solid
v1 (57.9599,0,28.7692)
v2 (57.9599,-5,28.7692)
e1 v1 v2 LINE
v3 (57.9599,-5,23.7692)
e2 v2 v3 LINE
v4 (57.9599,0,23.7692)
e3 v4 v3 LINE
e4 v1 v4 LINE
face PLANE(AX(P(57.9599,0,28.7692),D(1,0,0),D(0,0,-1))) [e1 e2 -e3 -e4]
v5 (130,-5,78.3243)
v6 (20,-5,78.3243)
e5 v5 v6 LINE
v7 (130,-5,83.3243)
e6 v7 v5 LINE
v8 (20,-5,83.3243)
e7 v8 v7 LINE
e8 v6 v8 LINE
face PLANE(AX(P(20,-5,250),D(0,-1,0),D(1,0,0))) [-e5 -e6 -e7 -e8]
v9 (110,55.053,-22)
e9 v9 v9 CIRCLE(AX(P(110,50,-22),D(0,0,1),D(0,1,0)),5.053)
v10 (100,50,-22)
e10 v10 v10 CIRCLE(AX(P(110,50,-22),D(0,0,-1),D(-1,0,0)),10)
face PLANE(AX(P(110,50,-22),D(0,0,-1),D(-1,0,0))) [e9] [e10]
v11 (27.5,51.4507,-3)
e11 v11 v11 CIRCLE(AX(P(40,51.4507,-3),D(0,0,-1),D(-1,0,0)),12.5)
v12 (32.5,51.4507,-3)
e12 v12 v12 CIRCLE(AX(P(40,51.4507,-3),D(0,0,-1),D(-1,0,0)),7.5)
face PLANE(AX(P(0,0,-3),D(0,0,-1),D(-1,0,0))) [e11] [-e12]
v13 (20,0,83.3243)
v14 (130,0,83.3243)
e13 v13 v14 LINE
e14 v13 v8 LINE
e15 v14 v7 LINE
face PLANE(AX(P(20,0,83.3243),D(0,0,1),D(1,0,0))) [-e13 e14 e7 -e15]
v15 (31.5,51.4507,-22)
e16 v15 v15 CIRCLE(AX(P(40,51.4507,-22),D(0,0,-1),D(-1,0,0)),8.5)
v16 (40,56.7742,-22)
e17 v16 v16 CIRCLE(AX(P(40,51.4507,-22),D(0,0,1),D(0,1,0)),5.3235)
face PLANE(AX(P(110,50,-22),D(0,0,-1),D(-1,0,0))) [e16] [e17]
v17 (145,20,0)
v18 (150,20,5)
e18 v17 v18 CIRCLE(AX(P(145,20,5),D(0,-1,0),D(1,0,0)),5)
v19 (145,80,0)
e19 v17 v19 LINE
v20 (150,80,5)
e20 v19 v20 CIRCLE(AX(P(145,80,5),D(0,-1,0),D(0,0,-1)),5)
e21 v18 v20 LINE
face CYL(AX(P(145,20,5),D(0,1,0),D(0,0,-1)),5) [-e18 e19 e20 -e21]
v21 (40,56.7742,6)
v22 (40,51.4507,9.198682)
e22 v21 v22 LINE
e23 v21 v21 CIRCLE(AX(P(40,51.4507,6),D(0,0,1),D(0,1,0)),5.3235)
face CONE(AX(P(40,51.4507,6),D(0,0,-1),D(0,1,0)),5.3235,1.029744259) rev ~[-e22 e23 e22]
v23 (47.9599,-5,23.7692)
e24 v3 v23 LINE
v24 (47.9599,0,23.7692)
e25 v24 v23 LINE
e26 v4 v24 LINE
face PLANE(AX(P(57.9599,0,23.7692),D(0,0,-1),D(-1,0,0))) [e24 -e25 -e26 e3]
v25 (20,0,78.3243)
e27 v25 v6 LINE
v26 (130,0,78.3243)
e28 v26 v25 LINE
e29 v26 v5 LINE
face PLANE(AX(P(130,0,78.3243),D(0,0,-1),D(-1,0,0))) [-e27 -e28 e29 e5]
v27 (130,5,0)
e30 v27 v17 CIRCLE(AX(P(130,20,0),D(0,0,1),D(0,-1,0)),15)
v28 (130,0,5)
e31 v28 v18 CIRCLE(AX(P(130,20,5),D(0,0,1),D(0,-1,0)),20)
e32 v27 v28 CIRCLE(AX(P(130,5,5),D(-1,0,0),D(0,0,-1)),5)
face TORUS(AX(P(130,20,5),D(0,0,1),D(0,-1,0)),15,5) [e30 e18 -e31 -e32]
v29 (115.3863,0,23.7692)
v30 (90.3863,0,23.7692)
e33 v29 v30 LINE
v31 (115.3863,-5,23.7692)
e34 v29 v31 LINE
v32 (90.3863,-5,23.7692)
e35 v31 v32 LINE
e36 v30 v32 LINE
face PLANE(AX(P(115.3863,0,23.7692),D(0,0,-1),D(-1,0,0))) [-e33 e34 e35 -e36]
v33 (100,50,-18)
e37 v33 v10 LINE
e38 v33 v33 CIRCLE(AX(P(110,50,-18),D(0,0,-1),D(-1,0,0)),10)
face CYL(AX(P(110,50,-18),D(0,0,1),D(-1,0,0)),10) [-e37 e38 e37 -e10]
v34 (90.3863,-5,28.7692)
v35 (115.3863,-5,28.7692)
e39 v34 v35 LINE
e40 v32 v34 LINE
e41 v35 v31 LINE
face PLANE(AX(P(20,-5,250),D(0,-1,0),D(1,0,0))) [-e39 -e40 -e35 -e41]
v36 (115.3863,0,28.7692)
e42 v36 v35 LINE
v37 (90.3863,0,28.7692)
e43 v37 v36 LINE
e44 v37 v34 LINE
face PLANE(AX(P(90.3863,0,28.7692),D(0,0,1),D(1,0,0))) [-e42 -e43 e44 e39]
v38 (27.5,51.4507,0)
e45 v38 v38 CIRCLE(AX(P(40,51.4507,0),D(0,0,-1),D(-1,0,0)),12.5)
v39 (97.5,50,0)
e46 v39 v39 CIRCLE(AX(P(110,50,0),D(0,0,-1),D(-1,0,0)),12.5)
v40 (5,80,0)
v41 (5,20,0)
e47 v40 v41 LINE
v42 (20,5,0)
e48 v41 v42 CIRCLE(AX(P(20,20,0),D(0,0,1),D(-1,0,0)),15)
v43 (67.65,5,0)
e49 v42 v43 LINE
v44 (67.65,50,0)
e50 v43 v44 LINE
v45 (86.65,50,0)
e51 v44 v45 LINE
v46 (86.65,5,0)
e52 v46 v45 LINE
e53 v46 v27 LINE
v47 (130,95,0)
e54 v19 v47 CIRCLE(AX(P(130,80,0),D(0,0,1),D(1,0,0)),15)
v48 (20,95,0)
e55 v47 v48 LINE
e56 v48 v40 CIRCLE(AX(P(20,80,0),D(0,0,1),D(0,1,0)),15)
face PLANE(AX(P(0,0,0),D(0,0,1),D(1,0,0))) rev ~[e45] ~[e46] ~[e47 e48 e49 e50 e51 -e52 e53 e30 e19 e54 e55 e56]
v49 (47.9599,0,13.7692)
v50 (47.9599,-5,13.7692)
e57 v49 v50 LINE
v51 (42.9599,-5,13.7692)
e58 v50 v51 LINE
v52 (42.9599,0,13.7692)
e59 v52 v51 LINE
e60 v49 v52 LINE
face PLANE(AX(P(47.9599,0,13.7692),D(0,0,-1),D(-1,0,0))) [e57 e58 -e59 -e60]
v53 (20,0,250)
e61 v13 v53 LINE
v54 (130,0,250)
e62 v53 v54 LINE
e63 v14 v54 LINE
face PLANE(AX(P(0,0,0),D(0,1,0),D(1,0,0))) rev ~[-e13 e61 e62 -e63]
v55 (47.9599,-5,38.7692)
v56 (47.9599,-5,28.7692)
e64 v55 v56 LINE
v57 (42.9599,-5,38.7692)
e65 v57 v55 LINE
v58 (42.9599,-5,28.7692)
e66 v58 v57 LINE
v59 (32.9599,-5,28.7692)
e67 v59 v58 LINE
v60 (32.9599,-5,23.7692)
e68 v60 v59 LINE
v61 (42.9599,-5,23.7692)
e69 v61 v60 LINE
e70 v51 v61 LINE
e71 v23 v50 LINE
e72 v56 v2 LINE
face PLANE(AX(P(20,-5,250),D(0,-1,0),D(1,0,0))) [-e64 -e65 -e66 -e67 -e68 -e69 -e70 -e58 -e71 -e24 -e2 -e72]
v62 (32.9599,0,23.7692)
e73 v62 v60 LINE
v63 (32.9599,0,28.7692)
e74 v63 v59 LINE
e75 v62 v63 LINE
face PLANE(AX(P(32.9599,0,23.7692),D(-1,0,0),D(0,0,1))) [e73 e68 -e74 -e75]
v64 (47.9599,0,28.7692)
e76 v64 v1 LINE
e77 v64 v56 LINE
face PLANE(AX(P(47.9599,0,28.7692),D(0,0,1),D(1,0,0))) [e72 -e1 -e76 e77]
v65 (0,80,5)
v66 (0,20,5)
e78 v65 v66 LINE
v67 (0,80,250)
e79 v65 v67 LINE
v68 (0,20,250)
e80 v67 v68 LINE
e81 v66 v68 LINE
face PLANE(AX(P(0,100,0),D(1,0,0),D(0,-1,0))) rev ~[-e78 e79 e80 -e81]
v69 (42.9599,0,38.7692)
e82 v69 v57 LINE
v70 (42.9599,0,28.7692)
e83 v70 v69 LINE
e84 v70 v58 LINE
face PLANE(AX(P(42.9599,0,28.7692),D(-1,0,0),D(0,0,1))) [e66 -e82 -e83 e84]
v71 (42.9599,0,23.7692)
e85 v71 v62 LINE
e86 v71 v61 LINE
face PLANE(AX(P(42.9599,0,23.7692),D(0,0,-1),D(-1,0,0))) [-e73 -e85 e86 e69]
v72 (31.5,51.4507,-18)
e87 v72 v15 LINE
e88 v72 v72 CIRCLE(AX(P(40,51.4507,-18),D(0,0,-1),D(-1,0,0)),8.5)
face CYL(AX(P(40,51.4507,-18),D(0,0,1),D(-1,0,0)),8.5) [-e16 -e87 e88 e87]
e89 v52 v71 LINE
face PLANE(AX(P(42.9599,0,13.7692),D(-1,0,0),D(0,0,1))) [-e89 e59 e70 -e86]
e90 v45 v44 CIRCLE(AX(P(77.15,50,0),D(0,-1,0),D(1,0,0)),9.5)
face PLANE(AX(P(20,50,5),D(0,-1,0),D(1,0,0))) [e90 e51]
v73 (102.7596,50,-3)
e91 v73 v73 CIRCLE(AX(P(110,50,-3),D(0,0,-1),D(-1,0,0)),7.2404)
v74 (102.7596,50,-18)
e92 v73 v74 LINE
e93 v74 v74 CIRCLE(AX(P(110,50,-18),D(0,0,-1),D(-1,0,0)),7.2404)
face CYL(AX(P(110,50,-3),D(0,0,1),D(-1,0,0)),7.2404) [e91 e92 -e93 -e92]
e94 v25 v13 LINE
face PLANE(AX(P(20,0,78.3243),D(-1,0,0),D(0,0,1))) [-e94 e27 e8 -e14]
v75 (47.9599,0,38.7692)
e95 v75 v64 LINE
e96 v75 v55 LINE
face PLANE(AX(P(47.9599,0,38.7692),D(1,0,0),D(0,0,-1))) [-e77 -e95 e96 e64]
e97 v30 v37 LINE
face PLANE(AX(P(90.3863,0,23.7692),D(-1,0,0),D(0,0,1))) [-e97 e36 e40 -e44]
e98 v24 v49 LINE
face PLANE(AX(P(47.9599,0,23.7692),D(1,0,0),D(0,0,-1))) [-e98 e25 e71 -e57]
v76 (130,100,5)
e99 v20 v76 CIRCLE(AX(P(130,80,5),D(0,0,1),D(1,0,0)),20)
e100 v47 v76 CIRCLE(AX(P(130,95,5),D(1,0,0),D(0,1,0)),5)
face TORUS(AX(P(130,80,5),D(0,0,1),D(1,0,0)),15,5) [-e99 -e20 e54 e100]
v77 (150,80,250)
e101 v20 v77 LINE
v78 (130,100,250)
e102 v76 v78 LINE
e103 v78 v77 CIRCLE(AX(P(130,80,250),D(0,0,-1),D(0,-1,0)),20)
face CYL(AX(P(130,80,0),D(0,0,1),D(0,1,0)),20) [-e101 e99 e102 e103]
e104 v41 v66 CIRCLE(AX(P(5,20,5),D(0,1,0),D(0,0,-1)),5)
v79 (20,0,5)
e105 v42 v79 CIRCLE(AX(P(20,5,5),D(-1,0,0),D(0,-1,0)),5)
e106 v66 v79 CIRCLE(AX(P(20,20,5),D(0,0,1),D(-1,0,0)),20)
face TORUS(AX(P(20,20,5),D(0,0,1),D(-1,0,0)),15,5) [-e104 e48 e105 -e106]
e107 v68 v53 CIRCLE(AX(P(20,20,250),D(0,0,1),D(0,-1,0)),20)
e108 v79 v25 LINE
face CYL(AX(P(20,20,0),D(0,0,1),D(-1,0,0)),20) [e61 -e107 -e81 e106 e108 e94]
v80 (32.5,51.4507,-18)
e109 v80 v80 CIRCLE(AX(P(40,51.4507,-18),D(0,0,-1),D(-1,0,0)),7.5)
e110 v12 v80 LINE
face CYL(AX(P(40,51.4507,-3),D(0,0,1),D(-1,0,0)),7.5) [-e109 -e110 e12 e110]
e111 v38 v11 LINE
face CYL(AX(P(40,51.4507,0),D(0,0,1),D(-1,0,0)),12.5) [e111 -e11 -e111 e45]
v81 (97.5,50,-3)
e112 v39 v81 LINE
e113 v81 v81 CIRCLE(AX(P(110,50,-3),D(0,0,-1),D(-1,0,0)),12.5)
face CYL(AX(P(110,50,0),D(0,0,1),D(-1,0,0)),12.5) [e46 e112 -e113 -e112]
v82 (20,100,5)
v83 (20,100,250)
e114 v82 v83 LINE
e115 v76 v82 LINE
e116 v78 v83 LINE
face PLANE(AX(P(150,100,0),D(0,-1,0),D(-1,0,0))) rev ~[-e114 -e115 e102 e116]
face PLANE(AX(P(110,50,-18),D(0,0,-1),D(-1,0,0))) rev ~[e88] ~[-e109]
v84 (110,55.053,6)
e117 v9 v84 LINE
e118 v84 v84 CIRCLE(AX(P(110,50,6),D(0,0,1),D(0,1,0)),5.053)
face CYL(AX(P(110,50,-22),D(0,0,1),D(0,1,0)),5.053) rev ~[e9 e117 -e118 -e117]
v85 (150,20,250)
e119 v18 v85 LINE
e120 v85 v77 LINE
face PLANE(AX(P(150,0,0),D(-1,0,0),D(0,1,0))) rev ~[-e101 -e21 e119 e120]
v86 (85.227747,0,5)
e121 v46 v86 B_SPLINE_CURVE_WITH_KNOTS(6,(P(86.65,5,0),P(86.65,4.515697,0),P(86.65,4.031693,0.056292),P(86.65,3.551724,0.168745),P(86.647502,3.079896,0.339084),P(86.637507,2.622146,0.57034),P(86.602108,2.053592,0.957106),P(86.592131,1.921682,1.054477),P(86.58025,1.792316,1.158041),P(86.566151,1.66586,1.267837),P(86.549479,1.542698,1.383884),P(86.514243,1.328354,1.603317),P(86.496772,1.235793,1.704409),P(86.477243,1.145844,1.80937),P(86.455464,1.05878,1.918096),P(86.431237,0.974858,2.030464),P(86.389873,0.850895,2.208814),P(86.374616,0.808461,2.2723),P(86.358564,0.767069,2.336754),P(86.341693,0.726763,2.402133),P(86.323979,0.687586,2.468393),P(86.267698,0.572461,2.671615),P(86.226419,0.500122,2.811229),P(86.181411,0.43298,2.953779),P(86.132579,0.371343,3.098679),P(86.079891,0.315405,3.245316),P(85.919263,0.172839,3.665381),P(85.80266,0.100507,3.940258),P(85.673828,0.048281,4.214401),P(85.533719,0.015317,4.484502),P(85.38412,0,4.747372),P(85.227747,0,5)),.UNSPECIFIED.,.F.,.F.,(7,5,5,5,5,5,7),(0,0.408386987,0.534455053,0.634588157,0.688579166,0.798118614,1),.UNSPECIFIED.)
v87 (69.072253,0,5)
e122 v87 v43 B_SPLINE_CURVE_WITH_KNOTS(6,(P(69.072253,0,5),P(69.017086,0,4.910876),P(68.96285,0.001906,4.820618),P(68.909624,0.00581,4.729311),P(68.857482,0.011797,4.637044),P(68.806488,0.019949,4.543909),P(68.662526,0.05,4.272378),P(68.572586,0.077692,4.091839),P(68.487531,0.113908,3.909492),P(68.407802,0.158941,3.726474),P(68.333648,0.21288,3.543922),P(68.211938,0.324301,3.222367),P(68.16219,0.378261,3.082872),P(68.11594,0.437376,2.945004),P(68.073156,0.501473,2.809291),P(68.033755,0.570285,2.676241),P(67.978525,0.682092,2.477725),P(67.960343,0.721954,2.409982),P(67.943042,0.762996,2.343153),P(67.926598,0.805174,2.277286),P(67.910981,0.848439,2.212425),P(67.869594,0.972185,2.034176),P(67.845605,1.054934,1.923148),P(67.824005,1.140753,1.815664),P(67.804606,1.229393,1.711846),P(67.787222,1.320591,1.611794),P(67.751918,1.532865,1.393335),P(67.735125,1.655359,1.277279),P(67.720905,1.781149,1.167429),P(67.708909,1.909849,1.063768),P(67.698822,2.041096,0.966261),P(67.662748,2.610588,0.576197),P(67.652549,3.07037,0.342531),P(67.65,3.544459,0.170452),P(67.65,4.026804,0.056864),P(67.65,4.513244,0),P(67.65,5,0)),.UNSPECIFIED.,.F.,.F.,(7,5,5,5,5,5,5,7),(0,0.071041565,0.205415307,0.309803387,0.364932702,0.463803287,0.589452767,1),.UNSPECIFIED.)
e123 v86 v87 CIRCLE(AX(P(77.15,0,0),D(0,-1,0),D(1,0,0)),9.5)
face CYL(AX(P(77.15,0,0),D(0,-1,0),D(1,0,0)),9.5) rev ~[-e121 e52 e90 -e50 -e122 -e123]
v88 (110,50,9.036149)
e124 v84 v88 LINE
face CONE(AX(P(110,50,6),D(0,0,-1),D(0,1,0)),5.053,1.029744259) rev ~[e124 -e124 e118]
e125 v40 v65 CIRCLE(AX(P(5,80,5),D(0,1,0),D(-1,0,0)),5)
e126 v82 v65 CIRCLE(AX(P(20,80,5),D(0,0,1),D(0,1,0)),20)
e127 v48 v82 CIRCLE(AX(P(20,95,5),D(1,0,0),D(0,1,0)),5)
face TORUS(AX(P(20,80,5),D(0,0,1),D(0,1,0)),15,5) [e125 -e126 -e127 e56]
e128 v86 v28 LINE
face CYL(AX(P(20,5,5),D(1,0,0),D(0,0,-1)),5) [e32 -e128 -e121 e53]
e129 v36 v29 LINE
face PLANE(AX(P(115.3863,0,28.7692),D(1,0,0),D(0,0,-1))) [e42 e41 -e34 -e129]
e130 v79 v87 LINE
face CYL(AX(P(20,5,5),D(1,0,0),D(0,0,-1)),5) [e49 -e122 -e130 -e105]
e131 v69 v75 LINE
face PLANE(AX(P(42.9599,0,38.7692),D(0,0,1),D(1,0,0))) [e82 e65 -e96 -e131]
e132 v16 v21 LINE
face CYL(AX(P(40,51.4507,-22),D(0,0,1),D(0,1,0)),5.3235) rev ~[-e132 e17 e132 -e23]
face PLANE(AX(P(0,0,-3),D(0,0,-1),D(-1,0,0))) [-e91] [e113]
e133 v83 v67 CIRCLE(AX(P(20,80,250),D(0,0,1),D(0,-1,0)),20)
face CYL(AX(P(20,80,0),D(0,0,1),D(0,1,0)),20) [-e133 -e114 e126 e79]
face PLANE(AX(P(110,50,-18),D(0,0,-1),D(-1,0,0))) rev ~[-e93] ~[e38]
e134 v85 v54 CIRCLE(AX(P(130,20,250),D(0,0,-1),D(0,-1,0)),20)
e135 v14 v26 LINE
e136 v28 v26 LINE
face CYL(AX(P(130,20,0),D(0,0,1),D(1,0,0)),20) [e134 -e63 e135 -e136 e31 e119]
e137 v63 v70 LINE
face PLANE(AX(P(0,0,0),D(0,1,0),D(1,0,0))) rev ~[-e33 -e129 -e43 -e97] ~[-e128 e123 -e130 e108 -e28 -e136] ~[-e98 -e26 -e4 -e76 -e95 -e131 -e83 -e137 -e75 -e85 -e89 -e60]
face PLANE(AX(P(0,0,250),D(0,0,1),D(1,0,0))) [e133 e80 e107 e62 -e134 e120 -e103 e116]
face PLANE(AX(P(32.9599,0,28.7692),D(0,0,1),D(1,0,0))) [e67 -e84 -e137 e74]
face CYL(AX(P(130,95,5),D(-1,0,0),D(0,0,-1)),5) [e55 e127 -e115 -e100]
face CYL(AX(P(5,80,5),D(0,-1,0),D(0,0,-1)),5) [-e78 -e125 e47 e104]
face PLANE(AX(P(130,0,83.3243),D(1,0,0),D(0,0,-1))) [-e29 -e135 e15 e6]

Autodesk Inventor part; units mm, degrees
ref_plane "YZ Plane" through (0, 0, 0) normal (1, 0, 0) x (0, 1, 0)
ref_plane "XZ Plane" through (0, 0, 0) normal (0, 1, 0) x (-1, 0, 0)
ref_plane "XY Plane" through (0, 0, 0) normal (0, 0, 1) x (1, 0, 0)
sketch "Sketch1" plane through (0, 0, 0) normal (0, 0, 1) x (1, 0, 0)
  line L0 (0, 0) -> (150, 0)
  line L1 (150, 0) -> (150, 100)
  line L2 (150, 100) -> (0, 100)
  line L3 (0, 100) -> (0, 0)
  dimension "d0" = 150
  dimension "d1" = 100
extrude "Extrusion1" add sketch "Sketch1" along normal blind 250
fillet "Fillet1" radius 20 1 edges at (150, 100, 125)
fillet "Fillet2" radius 20 1 edges at (150, 0, 125)
fillet "Fillet3" radius 20 1 edges at (0, 100, 125)
fillet "Fillet4" radius 20 1 edges at (0, 0, 125)
fillet "Fillet5" radius 5 8 edges at (5.8579, 94.1421, 0) (0, 50, 0) (5.8579, 5.8579, 0) (75, 0, 0) (144.1421, 5.8579, 0) (150, 50, 0) (144.1421, 94.1421, 0) (75, 100, 0)
sketch "Sketch2" plane through (20, 0, 250) normal (0, -1, 0) x (1, 0, 0)
  line L0 (110, 0) -> (110, -245) projected
  line L1 (0, -245) -> (0, 0) projected
  line L2 (110, -171.6757) -> (0, -171.6757)
  line L3 (0, -171.6757) -> (0, -166.6757)
  line L4 (0, -166.6757) -> (110, -166.6757)
  line L5 (110, -166.6757) -> (110, -171.6757)
  line L6 (95.3863, -226.2308) -> (70.3863, -226.2308)
  line L7 (70.3863, -226.2308) -> (70.3863, -221.2308)
  line L8 (70.3863, -221.2308) -> (95.3863, -221.2308)
  line L9 (95.3863, -221.2308) -> (95.3863, -226.2308)
  line L10 (37.9599, -226.2308) -> (12.9599, -226.2308)
  line L11 (12.9599, -226.2308) -> (12.9599, -221.2308)
  line L12 (12.9599, -221.2308) -> (37.9599, -221.2308)
  line L13 (37.9599, -221.2308) -> (37.9599, -226.2308)
  line L14 (27.9599, -236.2308) -> (22.9599, -236.2308)
  line L15 (22.9599, -236.2308) -> (22.9599, -211.2308)
  line L16 (22.9599, -211.2308) -> (27.9599, -211.2308)
  line L17 (27.9599, -211.2308) -> (27.9599, -236.2308)
  point P0 (-20, -250)
  point P1 (27.9599, -226.2308)
  point P2 (27.9599, -221.2308)
  point P3 (22.9599, -221.2308)
  point P4 (22.9599, -226.2308)
  dimension "d9" = 25
  dimension "d10" = 5
  dimension "d11" = 5
  dimension "d12" = 25
  dimension "d13" = 10
  dimension "d14" = 10
  dimension "d15" = 5
  dimension "d16" = 25
  dimension "d17" = 5
extrude "Extrusion2" add sketch "Sketch2" along normal blind 5
sketch "Sketch3" plane through (0, 0, 0) normal (0, 0, -1) x (-1, 0, 0)
  line L0 (-20, 100) -> (-130, 100) projected
  line L1 (-150, 80) -> (-150, 20) projected
  circle A0 centre (-110, 50) radius 12.5
  circle A1 centre (-40, 51.4507) radius 12.5
  point P0 (0, 0)
  point P1 (-150, 50)
  dimension "d20" = 50
  dimension "d21" = 40
  dimension "d22" = 70
  dimension "d23" = 25
  dimension "d24" = 25
extrude "Extrusion3" add sketch "Sketch3" along normal blind 3
sketch "Sketch4" plane through (110, 50, -3) normal (0, 0, -1) x (-1, 0, 0)
  circle A0 centre (0, 0) radius 7.2404
  circle A1 centre (70, 1.4507) radius 12.5 projected
  circle A2 centre (70, 1.4507) radius 7.5
  point P0 (110, -50)
  dimension "d27" = 15
extrude "Extrusion4" add sketch "Sketch4" along normal blind 15 contours A0 | A2
sketch "Sketch5" plane through (110, 50, -18) normal (0, 0, -1) x (-1, 0, 0)
  circle A0 centre (0, 0) radius 7.2404 projected
  circle A1 centre (0, 0) radius 10
  circle A2 centre (70, 1.4507) radius 7.5 projected
  circle A3 centre (70, 1.4507) radius 8.5
  point P0 (110, -50)
  dimension "d30" = 20
  dimension "d31" = 17
extrude "Extrusion5" add sketch "Sketch5" along normal blind 4 contours A0 | A1 | A2 | A3
sketch "Sketch6" plane through (110, 50, -22) normal (0, 0, -1) x (-1, 0, 0)
  circle A0 centre (0, 0) radius 10 projected
  point P0 (110, -50)
hole "Hole1" at (110, 50, -22) direction (0, 0, 1) diameter 10.106 depth 28 tip angle 118 thread size "M12x1.75" class "6H" standard "ISO Metric profile"
sketch "Sketch7" plane through (40, 51.4507, -22) normal (0, 0, -1) x (-1, 0, 0)
  circle A0 centre (0, 0) radius 8.5 projected
  point P0 (40, -51.4507)
hole "Hole2" at (40, 51.4507, -22) direction (0, 0, 1) diameter 10.647 depth 28 tip angle 118 thread size "M12x1.25" class "6H" standard "ISO Metric profile"
sketch "Sketch8" plane through (0, 20, 250) normal (-1, 0, 0) x (0, 0, 1)
  line L0 (-245, 80) -> (-245, 60) projected
  line L1 (-245, 60) -> (-73.5714, 60) construction
  line L2 (-73.5714, 60) -> (-73.5714, 0) construction
  line L3 (-73.5714, 0) -> (-245, 0) construction
  line L4 (-245, 0) -> (-245, 60) construction
  line L5 (-245, 0) -> (-245, 60) projected
  point P0 (-250, -20)
decal "Decal1"
sketch "Sketch9" plane through (20, 100, 250) normal (0, 1, 0) x (1, 0, 0)
  line L0 (0, 250) -> (110, 250) projected
  circle A0 centre (57.15, 250) radius 9.5
  point P0 (-20, 250)
  dimension "d50" = 19
sketch "Sketch10" plane through (20, 0, 5) normal (0, -1, 0) x (1, 0, 0)
  line L0 (0, -5) -> (110, -5) projected
  circle A0 centre (57.15, -5) radius 9.5
  point P0 (-20, -5)
  point P1 (66.65, -5)
  point P2 (47.65, -5)
  dimension "d51" = 19
extrude "Extrusion6" cut sketch "Sketch10" against normal blind 50 contours A0 L0 picked at (56.7683, -1.8564)
properties part number "battery eg 26"
